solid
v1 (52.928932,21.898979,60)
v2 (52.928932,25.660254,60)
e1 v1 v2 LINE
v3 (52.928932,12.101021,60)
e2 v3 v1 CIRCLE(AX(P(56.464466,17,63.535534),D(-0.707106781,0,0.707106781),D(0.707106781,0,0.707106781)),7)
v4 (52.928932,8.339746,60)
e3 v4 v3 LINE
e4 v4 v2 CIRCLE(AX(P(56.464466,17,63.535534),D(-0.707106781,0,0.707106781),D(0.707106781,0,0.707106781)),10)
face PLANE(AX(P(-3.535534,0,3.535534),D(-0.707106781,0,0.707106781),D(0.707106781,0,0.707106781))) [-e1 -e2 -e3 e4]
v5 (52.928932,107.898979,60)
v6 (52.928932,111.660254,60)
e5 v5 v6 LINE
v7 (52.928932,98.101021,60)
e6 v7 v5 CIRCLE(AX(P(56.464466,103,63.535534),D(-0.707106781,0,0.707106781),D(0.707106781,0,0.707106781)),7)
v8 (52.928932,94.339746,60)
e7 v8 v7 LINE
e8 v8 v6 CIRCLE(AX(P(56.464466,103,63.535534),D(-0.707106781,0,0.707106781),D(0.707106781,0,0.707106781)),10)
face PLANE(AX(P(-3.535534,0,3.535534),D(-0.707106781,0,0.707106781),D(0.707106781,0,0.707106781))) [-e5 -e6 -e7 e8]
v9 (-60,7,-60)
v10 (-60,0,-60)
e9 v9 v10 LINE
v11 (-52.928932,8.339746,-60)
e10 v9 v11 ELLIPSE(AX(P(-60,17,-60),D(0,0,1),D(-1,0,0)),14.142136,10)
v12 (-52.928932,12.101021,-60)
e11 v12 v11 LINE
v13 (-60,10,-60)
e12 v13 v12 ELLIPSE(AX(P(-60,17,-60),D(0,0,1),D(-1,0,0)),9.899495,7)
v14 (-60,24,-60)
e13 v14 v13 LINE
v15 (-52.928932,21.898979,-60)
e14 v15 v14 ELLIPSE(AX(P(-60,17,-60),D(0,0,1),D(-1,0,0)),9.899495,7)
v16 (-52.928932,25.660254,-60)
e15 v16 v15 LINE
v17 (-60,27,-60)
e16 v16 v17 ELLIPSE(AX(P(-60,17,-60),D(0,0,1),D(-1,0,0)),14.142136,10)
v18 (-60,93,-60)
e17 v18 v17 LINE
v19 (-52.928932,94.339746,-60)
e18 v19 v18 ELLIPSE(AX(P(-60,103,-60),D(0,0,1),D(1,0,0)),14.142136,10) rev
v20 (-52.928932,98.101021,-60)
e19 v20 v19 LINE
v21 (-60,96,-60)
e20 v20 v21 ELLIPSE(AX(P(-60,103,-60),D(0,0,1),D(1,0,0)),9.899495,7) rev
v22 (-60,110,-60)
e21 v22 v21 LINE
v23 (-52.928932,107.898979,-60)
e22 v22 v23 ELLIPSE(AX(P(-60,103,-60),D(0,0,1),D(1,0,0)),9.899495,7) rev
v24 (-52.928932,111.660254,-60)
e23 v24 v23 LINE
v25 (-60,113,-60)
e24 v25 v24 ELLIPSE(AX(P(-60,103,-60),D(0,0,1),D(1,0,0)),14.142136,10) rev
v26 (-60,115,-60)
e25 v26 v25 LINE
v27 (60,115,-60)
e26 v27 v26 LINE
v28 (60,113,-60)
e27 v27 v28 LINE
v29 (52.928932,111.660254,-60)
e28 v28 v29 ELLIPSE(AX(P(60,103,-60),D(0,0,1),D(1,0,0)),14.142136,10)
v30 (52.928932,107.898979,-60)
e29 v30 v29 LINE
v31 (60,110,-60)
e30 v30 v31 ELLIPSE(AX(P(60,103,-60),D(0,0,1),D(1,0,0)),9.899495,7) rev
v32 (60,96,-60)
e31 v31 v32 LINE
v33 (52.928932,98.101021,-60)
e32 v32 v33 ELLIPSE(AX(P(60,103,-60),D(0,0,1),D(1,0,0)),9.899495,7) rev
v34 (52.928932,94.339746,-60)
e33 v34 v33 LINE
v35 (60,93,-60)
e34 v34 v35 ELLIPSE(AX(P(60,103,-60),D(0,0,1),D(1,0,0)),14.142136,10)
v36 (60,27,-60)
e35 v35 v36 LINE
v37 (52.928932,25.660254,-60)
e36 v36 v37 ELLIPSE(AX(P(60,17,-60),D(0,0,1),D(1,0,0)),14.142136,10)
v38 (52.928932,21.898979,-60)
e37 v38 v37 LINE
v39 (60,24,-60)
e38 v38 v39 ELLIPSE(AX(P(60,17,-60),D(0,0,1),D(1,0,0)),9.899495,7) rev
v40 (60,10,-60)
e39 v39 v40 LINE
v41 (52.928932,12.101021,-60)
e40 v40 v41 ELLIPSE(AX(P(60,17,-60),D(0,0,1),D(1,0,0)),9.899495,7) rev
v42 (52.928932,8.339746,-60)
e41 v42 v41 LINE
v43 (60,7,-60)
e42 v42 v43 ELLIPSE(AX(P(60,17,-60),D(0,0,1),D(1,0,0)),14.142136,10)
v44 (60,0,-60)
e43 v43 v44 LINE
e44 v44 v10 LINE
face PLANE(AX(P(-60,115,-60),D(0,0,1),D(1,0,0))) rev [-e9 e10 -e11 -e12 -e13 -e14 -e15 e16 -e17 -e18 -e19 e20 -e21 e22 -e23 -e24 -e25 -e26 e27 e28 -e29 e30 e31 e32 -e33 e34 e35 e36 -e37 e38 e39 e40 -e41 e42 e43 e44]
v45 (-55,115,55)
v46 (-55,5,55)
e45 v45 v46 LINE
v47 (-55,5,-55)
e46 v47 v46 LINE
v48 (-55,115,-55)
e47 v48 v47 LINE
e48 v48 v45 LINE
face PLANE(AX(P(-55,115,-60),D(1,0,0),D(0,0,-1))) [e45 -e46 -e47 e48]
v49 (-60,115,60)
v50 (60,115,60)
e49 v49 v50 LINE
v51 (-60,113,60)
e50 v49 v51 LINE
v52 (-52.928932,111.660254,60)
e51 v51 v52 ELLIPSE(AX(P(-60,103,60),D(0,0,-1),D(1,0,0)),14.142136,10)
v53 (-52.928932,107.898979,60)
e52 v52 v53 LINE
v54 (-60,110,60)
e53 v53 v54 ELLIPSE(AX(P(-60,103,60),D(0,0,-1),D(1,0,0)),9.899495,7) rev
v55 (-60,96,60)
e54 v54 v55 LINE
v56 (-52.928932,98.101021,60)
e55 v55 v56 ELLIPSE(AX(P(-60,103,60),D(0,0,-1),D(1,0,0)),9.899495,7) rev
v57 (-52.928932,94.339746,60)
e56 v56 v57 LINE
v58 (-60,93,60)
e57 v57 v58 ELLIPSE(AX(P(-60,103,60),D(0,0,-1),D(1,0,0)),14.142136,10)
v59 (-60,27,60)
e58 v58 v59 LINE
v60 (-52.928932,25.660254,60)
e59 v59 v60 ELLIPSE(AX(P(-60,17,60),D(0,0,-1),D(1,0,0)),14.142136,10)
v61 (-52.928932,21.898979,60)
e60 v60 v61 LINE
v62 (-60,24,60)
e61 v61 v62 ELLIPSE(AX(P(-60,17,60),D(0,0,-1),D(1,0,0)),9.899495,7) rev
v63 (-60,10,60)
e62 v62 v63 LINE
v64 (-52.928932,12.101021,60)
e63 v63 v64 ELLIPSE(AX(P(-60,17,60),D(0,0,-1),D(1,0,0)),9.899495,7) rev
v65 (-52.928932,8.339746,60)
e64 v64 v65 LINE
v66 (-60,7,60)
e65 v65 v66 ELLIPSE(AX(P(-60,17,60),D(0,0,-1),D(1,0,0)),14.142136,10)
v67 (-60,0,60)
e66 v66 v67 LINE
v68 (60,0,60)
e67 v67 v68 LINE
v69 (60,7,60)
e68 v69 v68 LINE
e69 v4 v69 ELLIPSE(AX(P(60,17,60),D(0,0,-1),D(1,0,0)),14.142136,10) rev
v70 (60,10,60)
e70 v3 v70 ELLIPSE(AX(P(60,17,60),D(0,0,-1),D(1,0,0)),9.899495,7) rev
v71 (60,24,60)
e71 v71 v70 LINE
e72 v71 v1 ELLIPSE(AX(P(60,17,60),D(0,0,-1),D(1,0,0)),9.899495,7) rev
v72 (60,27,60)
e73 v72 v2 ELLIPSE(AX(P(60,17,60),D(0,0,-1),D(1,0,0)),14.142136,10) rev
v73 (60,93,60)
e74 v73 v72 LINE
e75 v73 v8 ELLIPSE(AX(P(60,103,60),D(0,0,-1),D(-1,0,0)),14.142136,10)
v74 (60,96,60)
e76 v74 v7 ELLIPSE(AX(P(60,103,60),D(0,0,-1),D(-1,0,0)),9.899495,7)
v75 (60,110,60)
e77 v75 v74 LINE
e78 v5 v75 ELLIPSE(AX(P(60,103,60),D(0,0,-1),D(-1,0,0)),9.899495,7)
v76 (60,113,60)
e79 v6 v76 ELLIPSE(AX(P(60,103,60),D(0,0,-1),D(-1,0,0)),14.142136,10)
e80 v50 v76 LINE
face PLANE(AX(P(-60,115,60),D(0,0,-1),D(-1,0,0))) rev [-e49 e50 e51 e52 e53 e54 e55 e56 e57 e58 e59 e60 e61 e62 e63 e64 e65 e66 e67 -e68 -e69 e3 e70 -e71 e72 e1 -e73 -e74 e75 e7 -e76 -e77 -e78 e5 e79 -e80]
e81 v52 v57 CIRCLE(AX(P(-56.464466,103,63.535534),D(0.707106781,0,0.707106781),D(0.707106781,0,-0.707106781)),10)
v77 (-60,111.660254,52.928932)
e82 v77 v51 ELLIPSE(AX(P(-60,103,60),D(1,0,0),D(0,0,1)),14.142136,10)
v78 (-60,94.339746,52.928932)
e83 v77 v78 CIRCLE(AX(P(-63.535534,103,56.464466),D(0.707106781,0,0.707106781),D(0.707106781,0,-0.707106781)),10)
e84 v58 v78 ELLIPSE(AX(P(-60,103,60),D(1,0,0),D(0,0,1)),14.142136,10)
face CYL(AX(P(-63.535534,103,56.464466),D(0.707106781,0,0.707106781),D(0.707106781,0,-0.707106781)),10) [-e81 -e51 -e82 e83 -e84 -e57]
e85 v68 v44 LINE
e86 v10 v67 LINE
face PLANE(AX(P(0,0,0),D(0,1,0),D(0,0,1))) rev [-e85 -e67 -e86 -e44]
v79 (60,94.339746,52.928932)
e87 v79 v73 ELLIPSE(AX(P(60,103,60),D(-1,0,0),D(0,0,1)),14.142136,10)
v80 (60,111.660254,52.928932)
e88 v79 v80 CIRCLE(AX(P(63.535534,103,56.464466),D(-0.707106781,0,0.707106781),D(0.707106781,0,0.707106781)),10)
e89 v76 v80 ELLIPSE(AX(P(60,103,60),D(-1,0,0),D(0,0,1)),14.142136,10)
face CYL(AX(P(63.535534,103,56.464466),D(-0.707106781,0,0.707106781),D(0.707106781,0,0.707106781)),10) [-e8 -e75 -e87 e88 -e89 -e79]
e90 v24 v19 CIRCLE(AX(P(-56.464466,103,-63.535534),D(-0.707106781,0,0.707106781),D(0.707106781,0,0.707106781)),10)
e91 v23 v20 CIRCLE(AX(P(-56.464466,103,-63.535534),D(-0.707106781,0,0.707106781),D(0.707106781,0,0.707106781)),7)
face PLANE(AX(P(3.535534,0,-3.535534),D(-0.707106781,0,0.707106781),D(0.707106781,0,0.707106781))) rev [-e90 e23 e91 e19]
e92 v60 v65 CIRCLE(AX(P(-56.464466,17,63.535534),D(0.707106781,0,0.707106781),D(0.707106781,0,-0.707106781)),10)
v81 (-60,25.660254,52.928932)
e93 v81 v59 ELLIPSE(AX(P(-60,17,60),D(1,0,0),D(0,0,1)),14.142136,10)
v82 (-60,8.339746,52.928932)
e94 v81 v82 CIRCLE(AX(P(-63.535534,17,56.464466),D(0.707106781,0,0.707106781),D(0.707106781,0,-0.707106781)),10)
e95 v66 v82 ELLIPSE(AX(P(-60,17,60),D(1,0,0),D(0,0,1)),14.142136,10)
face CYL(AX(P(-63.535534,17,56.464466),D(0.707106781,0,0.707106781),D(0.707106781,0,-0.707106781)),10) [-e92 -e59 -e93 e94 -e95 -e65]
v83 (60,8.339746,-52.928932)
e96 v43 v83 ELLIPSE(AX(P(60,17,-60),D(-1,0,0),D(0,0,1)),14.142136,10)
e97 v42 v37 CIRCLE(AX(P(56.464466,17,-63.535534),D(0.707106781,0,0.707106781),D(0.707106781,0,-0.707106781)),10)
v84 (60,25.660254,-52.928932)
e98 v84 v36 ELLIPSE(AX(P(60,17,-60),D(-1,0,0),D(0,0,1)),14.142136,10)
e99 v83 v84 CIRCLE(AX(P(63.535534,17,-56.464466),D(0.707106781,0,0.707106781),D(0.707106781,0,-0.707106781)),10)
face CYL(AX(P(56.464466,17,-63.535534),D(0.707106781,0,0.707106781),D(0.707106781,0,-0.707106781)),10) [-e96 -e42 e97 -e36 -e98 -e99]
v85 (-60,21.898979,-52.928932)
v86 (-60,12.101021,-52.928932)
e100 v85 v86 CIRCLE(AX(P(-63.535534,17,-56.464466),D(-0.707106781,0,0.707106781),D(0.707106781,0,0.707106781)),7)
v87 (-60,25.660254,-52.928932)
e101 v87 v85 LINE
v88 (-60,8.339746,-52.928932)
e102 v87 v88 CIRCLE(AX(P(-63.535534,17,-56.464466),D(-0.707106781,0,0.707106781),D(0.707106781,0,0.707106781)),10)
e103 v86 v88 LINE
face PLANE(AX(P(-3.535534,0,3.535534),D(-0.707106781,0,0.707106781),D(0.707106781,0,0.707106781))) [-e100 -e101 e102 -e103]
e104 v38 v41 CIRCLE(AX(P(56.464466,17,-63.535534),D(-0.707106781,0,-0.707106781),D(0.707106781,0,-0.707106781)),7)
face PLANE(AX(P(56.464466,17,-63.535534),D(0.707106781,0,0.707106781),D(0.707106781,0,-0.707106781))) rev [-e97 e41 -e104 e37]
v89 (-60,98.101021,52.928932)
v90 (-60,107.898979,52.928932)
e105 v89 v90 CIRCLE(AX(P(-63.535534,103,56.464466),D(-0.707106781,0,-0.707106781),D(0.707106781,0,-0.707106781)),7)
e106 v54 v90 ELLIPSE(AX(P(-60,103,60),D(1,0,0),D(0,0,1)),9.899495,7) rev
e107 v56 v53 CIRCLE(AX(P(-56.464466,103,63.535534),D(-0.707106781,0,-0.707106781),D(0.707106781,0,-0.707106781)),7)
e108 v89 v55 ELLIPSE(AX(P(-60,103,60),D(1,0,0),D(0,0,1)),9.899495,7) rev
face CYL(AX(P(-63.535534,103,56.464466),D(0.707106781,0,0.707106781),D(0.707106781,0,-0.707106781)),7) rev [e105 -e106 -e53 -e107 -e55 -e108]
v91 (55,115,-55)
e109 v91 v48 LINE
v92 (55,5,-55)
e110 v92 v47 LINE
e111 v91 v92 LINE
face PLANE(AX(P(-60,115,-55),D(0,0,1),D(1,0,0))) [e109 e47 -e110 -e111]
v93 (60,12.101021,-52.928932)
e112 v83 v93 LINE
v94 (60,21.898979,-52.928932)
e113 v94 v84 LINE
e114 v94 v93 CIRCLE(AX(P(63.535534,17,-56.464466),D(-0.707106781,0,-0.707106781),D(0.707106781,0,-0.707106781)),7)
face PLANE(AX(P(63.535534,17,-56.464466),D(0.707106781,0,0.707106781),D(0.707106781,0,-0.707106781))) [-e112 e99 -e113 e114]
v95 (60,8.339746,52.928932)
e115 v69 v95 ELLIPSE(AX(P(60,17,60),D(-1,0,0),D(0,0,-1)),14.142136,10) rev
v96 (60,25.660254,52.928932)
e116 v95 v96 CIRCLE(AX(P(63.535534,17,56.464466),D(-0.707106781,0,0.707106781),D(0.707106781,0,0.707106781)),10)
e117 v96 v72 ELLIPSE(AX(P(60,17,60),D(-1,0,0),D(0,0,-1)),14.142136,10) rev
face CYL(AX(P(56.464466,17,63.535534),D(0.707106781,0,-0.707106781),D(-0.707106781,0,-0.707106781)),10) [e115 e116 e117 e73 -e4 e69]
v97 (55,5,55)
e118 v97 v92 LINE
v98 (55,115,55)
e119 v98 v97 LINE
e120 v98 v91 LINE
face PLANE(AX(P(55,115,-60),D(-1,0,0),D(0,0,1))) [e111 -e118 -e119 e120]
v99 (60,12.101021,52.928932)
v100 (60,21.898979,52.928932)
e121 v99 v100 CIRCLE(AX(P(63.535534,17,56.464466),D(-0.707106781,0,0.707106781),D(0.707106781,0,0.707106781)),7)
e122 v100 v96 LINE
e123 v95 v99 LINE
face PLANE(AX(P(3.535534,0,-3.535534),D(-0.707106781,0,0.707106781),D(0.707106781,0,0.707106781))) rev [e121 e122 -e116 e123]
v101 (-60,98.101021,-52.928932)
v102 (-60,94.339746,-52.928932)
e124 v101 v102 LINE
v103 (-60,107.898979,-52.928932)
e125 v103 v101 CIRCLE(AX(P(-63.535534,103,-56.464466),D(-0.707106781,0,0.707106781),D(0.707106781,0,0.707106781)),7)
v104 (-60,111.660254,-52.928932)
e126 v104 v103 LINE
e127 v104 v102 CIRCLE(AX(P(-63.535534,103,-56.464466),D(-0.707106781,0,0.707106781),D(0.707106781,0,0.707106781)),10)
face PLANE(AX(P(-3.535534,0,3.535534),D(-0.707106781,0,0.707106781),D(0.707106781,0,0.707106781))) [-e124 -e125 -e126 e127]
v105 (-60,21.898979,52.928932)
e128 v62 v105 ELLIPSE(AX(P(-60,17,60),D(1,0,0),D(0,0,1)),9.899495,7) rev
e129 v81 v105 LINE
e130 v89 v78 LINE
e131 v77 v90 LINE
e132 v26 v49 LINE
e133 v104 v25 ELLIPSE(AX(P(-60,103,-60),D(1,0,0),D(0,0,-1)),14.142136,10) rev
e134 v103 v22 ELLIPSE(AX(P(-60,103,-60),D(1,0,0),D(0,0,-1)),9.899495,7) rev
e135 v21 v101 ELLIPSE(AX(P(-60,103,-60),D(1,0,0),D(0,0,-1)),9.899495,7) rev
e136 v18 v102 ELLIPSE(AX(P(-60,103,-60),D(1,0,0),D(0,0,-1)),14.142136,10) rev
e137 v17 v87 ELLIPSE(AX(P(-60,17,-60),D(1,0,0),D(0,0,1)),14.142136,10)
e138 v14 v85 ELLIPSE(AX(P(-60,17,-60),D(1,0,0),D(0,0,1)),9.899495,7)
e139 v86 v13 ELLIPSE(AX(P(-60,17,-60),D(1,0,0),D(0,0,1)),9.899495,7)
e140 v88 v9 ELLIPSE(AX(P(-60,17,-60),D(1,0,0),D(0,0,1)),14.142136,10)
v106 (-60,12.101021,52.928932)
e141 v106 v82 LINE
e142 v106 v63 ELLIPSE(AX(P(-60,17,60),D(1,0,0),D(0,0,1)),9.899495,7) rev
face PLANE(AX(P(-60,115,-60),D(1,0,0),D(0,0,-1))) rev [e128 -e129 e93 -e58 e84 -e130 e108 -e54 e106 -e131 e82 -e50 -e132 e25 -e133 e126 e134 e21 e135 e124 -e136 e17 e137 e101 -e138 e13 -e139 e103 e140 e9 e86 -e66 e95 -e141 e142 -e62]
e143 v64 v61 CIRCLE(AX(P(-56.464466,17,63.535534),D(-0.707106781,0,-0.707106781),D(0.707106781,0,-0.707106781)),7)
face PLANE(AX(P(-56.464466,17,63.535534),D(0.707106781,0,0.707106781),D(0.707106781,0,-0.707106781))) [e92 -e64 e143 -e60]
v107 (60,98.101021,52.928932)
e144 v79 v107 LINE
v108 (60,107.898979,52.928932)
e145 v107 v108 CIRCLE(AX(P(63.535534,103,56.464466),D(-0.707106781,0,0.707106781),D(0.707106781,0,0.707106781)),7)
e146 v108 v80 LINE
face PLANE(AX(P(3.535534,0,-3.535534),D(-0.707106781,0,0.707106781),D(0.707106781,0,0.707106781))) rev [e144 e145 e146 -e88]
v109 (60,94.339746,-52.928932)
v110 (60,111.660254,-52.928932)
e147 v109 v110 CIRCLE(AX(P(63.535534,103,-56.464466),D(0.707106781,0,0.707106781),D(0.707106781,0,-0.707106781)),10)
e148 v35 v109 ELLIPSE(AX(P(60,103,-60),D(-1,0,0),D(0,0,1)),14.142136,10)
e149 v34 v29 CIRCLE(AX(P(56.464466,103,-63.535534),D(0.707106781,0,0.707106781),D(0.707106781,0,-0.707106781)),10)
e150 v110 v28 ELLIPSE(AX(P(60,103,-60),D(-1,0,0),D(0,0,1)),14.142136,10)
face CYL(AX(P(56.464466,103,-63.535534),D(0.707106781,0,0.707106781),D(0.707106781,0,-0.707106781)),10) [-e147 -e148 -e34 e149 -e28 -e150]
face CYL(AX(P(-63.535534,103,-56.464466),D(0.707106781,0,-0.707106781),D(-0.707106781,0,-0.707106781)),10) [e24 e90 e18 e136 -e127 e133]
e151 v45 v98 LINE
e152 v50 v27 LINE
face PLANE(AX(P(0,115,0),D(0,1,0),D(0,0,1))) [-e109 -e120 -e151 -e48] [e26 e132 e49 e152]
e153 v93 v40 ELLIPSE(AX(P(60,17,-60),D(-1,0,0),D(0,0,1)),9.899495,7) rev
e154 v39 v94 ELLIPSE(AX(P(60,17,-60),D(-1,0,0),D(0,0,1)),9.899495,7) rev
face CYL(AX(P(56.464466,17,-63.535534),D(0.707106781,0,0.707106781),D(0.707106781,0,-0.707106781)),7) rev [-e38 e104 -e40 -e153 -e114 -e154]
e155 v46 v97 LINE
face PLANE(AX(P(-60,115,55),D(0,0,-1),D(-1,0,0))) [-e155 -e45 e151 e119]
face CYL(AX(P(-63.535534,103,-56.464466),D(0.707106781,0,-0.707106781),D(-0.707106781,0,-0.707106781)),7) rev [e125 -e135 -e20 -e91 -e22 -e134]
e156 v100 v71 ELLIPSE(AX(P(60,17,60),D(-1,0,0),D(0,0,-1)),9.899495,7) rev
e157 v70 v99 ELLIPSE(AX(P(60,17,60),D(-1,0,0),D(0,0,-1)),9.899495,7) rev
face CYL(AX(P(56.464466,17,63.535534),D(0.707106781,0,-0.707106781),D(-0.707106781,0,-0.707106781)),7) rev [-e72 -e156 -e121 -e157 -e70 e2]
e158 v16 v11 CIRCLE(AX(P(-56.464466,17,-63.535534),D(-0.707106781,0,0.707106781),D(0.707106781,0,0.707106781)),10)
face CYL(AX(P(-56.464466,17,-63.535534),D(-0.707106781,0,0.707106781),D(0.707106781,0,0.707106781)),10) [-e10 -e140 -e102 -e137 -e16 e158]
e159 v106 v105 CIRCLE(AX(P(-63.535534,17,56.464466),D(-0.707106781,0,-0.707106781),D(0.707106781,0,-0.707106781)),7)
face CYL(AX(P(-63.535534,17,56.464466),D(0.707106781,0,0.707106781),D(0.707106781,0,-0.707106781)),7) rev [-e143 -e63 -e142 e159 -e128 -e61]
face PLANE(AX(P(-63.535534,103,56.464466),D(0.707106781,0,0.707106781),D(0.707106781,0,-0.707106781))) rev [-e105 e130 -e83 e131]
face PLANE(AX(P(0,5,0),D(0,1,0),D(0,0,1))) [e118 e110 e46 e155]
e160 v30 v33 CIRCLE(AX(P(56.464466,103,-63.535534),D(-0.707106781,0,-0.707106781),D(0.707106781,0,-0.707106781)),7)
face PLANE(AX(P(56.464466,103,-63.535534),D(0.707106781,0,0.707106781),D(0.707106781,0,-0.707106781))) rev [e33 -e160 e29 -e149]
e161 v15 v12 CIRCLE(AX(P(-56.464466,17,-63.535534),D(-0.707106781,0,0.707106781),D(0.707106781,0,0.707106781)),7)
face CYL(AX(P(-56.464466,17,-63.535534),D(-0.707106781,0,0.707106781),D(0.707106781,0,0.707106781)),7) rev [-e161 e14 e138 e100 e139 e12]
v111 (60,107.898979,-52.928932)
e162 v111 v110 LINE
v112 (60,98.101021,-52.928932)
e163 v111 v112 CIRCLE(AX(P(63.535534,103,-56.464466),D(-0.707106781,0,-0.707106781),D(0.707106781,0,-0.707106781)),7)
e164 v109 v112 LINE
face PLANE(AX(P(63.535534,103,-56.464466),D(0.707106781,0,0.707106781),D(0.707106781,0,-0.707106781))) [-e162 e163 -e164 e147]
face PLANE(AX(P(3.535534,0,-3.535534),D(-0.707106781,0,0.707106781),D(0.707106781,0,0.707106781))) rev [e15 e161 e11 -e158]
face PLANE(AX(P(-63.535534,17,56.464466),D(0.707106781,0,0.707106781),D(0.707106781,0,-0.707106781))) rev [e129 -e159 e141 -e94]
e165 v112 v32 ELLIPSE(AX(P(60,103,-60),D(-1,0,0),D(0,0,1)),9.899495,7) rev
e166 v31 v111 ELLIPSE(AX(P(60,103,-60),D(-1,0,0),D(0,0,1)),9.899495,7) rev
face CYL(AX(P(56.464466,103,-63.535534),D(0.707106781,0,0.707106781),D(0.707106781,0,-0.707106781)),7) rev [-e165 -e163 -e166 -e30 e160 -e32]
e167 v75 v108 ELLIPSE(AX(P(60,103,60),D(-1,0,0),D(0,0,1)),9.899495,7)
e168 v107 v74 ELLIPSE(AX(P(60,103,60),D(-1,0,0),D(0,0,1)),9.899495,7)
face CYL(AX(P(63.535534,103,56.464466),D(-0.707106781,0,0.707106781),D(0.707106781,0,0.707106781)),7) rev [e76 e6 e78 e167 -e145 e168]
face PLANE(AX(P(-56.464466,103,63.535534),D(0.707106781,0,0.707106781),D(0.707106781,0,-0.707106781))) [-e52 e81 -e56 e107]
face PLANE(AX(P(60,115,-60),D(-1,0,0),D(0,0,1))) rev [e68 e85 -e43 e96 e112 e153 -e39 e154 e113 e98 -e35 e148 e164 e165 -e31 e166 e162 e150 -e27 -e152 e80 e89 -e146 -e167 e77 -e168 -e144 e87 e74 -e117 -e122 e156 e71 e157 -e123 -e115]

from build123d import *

# Parameters (mm, degrees)
SKETCH1_W                = 120
SKETCH1_H                = 120
BOSS_EXTRUDE1_DEPTH      = 115
SHELL1_T                 = -5
BOSS_EXTRUDE2_DEPTH      = 5
BOSS_EXTRUDE2_DEPTH_BACK = 5
BOSS_EXTRUDE3_DEPTH      = 5
BOSS_EXTRUDE3_DEPTH_BACK = 5


with BuildPart() as part:
    # Sketch1 → Boss-Extrude1 (new body)
    with BuildSketch(Plane(origin=(0, 0, 0), x_dir=(1, 0, 0), z_dir=(0, 1, 0))):
        Rectangle(SKETCH1_W, SKETCH1_H)
    extrude(amount=BOSS_EXTRUDE1_DEPTH)

    # Shell1
    shell1_openings = [part.faces().sort_by_distance(p)[0] for p in [
        (0, 115, 0),
    ]]
    offset(amount=SHELL1_T, openings=shell1_openings, kind=Kind.INTERSECTION)

    # Sketch2 → Boss-Extrude2 (add, two sides: drawn at the far end of the back side and taken through both)
    with BuildSketch(Plane(origin=(0, 0, 0), x_dir=(0.7071067811865475, 0, 0.7071067811865477), z_dir=(-0.7071067811865477, 0, 0.7071067811865475)).offset(-BOSS_EXTRUDE2_DEPTH_BACK)):
        with BuildLine():
            Line((-78.852813742, 20.605551275), (-78.852813742, 25))
            ThreePointArc((-78.852813742, 25), (-94.852813742, 17), (-78.852813742, 9))
            Line((-78.852813742, 9), (-78.852813742, 13.394448725))
            ThreePointArc((-78.852813742, 13.394448725), (-91.852813742, 17), (-78.852813742, 20.605551275))
        make_face()
        with BuildLine():
            Line((-78.852813742, 106.605551275), (-78.852813742, 111))
            ThreePointArc((-78.852813742, 111), (-94.852813742, 103), (-78.852813742, 95))
            Line((-78.852813742, 95), (-78.852813742, 99.394448725))
            ThreePointArc((-78.852813742, 99.394448725), (-91.852813742, 103), (-78.852813742, 106.605551275))
        make_face()
        with BuildLine():
            ThreePointArc((78.852813742, 95), (94.852813742, 103), (78.852813742, 111))
            Line((78.852813742, 111), (78.852813742, 106.605551275))
            ThreePointArc((78.852813742, 106.605551275), (91.852813742, 103), (78.852813742, 99.394448725))
            Line((78.852813742, 99.394448725), (78.852813742, 95))
        make_face()
        with BuildLine():
            ThreePointArc((78.852813742, 9), (94.852813742, 17), (78.852813742, 25))
            Line((78.852813742, 25), (78.852813742, 20.605551275))
            ThreePointArc((78.852813742, 20.605551275), (91.852813742, 17), (78.852813742, 13.394448725))
            Line((78.852813742, 13.394448725), (78.852813742, 9))
        make_face()
    extrude(amount=BOSS_EXTRUDE2_DEPTH + BOSS_EXTRUDE2_DEPTH_BACK)

    # Sketch3 → Boss-Extrude3 (add, two sides: drawn at the far end of the back side and taken through both)
    with BuildSketch(Plane(origin=(0, 0, 0), x_dir=(0.7071067811865475, 0, -0.7071067811865476), z_dir=(0.7071067811865476, 0, 0.7071067811865475)).offset(-BOSS_EXTRUDE3_DEPTH_BACK)):
        with BuildLine():
            Line((-78.852813742, 111), (-78.852813742, 106.605551275))
            ThreePointArc((-78.852813742, 106.605551275), (-91.852813742, 103), (-78.852813742, 99.394448725))
            Line((-78.852813742, 99.394448725), (-78.852813742, 95))
            ThreePointArc((-78.852813742, 95), (-94.852813742, 103), (-78.852813742, 111))
        make_face()
        with BuildLine():
            Line((78.852813742, 111), (78.852813742, 106.605551275))
            ThreePointArc((78.852813742, 106.605551275), (91.852813742, 103), (78.852813742, 99.394448725))
            Line((78.852813742, 99.394448725), (78.852813742, 95))
            ThreePointArc((78.852813742, 95), (94.852813742, 103), (78.852813742, 111))
        make_face()
        with BuildLine():
            Line((-78.852813742, 13.394448725), (-78.852813742, 9))
            ThreePointArc((-78.852813742, 9), (-94.852813742, 17), (-78.852813742, 25))
            Line((-78.852813742, 25), (-78.852813742, 20.605551275))
            ThreePointArc((-78.852813742, 20.605551275), (-91.852813742, 17), (-78.852813742, 13.394448725))
        make_face()
        with BuildLine():
            Line((78.852813742, 25), (78.852813742, 20.605551275))
            ThreePointArc((78.852813742, 20.605551275), (91.852813742, 17), (78.852813742, 13.394448725))
            Line((78.852813742, 13.394448725), (78.852813742, 9))
            ThreePointArc((78.852813742, 9), (94.852813742, 17), (78.852813742, 25))
        make_face()
    extrude(amount=BOSS_EXTRUDE3_DEPTH + BOSS_EXTRUDE3_DEPTH_BACK)


solid = part.part
